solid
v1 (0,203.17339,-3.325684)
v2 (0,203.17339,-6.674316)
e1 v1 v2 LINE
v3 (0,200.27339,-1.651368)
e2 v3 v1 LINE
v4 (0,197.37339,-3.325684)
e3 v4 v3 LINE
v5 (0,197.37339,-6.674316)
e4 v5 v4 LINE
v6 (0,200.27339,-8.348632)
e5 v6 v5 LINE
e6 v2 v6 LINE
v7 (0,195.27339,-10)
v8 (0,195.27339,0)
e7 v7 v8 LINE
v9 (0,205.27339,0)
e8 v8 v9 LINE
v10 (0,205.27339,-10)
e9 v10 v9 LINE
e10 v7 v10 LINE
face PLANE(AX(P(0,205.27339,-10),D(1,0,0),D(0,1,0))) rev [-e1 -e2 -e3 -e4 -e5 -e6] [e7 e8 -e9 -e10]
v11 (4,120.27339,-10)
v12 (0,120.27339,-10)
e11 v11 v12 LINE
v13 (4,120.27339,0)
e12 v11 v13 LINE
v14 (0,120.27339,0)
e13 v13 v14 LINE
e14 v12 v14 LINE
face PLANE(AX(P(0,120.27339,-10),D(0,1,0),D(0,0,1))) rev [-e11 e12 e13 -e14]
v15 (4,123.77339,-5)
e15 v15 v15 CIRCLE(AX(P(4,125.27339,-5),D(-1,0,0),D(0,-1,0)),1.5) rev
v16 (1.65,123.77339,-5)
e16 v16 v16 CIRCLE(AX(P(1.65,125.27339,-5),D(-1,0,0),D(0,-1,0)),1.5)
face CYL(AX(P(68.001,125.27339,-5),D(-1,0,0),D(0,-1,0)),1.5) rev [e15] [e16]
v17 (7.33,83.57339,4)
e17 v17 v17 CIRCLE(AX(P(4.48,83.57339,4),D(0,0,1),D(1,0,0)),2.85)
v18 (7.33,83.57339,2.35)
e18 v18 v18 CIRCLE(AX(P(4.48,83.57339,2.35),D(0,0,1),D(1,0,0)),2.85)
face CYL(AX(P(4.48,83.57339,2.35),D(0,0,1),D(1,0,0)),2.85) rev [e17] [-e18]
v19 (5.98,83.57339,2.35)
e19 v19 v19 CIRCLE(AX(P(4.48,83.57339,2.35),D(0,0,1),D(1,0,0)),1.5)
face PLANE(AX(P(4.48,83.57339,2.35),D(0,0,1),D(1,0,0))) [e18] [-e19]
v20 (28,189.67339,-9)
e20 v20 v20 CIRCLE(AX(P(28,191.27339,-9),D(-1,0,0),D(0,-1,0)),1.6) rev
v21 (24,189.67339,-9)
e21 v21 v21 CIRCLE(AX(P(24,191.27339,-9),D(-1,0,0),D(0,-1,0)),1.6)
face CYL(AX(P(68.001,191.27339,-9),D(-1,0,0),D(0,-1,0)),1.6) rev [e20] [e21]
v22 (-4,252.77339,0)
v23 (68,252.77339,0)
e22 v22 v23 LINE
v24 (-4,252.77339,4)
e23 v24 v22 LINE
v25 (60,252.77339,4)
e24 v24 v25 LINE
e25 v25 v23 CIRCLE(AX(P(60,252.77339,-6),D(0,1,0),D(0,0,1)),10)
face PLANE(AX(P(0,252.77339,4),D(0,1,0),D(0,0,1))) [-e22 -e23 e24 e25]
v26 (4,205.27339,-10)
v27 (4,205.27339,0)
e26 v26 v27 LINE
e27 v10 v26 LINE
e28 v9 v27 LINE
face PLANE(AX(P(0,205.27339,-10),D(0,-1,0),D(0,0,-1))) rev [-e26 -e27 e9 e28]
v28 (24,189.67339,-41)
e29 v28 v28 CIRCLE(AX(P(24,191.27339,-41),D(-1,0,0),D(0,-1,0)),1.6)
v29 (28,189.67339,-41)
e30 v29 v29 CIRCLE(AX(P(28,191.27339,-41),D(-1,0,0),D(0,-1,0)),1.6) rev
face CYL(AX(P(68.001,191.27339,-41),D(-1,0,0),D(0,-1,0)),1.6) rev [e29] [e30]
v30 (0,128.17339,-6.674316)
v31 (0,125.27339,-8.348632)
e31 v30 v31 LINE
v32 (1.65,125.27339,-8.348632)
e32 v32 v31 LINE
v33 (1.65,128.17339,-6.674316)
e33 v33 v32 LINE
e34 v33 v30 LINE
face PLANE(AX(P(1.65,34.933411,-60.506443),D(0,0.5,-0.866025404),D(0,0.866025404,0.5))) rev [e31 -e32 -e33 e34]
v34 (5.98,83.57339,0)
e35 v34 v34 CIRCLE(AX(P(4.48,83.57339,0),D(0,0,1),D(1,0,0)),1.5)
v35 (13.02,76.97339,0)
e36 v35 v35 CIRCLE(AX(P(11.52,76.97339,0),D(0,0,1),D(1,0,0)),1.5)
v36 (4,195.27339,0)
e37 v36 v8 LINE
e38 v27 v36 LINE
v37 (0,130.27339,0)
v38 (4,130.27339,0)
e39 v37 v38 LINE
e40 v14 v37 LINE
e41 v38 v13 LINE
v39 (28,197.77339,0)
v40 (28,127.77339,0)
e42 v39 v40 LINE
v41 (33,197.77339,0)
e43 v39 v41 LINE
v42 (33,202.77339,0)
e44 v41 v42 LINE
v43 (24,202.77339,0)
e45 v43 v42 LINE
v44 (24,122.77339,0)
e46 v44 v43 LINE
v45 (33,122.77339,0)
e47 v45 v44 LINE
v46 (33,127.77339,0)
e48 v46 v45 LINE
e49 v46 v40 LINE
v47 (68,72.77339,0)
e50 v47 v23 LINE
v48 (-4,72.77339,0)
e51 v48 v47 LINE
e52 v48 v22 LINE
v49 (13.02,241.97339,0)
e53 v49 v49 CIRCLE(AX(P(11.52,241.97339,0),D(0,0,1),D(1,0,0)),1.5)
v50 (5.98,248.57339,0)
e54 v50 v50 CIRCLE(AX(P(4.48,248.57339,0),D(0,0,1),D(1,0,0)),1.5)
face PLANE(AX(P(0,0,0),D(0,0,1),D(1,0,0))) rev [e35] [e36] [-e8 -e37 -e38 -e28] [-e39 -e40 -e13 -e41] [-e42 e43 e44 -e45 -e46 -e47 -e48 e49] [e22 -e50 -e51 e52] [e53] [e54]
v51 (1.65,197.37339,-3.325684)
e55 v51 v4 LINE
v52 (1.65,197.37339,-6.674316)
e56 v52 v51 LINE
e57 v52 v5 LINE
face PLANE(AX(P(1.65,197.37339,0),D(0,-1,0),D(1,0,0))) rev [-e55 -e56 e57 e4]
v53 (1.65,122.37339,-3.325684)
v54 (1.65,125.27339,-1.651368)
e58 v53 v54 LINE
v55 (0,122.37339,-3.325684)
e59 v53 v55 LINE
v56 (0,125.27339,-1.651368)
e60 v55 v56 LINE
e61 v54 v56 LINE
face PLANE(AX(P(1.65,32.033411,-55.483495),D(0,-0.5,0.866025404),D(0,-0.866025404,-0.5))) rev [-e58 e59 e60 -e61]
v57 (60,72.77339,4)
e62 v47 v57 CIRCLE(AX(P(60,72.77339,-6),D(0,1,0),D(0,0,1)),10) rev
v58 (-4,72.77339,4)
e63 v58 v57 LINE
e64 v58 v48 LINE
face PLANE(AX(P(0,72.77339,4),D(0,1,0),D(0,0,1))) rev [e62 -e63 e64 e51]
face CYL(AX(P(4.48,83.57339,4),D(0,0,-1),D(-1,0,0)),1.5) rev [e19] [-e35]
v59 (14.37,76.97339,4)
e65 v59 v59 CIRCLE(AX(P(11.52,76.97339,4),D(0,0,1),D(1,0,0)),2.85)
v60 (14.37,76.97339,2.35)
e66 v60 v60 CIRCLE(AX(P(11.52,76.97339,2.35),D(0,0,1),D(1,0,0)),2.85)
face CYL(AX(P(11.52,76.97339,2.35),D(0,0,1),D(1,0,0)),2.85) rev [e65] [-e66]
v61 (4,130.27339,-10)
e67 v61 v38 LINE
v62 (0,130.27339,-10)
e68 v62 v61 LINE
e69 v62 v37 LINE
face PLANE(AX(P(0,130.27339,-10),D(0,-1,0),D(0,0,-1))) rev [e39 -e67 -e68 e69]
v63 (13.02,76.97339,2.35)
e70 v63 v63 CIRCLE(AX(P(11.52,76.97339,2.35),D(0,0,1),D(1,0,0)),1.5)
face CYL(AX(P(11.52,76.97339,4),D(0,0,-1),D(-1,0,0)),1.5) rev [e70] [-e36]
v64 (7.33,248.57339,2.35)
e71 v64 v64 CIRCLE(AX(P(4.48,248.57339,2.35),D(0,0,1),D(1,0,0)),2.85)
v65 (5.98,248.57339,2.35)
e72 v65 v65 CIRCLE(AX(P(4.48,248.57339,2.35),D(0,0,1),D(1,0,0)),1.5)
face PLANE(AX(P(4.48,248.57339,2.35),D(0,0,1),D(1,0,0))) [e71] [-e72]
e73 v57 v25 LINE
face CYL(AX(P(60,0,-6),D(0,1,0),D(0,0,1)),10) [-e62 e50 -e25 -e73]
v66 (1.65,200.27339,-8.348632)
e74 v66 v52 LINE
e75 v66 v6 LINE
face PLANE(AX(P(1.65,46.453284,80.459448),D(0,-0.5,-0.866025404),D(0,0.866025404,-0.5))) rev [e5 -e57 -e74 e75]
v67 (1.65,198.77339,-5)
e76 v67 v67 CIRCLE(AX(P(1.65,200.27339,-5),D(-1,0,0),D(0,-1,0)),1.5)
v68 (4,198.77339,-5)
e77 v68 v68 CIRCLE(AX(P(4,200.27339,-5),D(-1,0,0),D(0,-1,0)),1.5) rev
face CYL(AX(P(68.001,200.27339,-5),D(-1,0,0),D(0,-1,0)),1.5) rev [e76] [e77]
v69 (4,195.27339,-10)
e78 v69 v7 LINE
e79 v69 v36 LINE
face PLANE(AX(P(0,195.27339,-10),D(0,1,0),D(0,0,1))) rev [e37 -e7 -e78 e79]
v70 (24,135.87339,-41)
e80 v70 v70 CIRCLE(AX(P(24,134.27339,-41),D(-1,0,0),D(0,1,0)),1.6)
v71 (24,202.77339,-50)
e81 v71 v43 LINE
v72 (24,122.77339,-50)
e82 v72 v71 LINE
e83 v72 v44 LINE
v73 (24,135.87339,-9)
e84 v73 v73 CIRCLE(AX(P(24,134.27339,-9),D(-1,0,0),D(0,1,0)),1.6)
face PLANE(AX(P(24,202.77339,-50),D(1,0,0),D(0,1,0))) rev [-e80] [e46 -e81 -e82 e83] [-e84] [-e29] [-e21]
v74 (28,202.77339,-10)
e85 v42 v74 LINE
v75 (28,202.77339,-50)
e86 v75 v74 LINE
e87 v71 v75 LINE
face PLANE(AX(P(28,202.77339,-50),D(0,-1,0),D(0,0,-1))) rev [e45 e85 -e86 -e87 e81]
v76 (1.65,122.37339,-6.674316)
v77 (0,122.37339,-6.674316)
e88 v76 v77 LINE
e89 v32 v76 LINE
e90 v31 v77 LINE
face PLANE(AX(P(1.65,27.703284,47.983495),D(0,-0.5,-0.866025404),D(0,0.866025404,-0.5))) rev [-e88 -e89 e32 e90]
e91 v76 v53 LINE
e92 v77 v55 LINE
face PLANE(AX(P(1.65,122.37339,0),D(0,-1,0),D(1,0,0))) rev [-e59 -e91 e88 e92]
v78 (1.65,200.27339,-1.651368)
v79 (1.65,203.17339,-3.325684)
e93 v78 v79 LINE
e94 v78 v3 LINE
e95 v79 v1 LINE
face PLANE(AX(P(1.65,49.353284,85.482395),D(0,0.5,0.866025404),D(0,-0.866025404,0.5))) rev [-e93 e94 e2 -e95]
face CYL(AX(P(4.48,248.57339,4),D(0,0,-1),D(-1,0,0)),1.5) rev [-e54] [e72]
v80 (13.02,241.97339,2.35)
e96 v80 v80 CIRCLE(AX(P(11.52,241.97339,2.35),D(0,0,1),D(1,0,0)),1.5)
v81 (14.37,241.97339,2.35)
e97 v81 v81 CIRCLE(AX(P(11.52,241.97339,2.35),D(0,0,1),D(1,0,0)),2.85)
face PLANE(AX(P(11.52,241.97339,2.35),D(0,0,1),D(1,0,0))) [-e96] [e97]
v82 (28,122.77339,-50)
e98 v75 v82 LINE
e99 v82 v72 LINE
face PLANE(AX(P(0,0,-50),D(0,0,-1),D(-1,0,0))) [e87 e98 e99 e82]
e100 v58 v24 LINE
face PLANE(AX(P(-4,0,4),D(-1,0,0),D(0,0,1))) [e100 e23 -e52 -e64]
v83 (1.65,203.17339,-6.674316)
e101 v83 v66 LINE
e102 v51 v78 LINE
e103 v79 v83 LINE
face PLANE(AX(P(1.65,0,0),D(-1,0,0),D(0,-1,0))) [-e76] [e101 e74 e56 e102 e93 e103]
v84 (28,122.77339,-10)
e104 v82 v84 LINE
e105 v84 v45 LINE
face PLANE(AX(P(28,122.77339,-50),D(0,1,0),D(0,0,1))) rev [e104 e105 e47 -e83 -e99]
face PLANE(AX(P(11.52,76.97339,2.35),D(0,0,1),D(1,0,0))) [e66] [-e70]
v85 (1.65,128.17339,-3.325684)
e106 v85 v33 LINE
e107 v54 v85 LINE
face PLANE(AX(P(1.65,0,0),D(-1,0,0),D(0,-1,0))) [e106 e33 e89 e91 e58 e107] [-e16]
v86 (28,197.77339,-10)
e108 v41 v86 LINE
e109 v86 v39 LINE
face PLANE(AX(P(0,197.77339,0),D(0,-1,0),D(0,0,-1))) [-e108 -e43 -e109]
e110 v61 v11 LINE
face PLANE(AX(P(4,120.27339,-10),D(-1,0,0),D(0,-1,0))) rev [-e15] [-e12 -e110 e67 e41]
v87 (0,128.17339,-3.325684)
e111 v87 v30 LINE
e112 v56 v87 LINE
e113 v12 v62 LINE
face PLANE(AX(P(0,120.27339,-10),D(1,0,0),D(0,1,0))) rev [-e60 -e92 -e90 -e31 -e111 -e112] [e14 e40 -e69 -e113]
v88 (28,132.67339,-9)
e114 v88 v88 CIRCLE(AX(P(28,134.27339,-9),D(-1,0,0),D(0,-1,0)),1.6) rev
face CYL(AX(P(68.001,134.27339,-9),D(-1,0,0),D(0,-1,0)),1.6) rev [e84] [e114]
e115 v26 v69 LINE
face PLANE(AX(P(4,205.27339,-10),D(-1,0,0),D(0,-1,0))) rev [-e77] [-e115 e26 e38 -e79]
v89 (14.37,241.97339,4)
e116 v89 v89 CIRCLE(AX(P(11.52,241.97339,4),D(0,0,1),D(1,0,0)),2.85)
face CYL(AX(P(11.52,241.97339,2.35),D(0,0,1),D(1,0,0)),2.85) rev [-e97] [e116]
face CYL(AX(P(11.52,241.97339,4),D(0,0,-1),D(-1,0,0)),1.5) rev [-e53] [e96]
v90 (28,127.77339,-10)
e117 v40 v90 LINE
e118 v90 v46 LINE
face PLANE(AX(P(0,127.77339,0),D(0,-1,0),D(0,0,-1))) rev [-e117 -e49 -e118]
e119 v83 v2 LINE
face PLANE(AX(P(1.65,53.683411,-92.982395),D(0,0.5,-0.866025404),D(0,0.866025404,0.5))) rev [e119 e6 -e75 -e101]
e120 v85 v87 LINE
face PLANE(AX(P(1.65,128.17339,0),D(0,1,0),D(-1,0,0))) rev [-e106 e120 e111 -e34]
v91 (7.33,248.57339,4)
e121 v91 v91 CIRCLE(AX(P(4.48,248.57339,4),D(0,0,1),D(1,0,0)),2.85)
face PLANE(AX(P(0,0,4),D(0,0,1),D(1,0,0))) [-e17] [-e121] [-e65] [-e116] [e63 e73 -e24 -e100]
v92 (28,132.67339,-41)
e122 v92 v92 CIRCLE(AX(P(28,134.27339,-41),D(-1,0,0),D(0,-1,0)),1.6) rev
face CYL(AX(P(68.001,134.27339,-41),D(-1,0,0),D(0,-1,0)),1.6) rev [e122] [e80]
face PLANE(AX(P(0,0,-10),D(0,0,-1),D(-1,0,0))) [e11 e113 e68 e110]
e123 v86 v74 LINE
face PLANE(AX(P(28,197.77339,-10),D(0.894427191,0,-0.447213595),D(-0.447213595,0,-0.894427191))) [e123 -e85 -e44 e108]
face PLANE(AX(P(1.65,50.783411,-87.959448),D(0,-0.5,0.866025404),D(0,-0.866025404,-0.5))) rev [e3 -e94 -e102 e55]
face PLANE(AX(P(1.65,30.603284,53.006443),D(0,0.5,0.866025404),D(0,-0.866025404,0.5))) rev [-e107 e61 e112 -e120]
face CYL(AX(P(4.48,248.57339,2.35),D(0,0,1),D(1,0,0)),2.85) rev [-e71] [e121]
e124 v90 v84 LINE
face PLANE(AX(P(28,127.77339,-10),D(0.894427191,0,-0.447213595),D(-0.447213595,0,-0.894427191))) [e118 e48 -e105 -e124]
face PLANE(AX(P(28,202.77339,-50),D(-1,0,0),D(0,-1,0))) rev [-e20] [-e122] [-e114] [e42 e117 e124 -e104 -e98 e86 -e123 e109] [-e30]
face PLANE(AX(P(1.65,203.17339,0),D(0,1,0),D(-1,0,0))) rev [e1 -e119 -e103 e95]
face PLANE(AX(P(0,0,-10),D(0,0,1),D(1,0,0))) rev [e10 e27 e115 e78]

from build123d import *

# Parameters (mm, degrees)
CROQUIS1_W              = 72
CROQUIS1_H              = 180
CROQUIS1_R              = 2.85
CROQUIS1_R_2            = 1.5
SALIENTE_EXTRUIR1_DEPTH = 4
CROQUIS2_R              = 2.85
CORTAR_EXTRUIR1_DEPTH   = 1.65
CROQUIS3_W              = 4
CROQUIS3_H              = 10
SALIENTE_EXTRUIR2_DEPTH = 10
CORTAR_EXTRUIR2_REACH   = 263.951
CROQUIS4_R              = 1.5
CROQUIS4_3_R            = 1.5
CORTAR_EXTRUIR3_DEPTH   = 1.65
REDONDEO3_R             = 10
CROQUIS5_W              = 4
CROQUIS5_H              = 80
SALIENTE_EXTRUIR3_DEPTH = 50
SALIENTE_EXTRUIR4_DEPTH = 5
SALIENTE_EXTRUIR5_DEPTH = 5
CORTAR_EXTRUIR4_REACH   = 263.401
CROQUIS9_R              = 1.6


with BuildPart() as part:
    # Croquis1 → Saliente-Extruir1 (new body)
    # profile 1 of 5: a face of its own
    with BuildSketch(Plane.XY):
        with Locations((32, 162.773389683)):
            Rectangle(CROQUIS1_W, CROQUIS1_H)
        with Locations((4.48, 83.573389683)):
            Circle(CROQUIS1_R, mode=Mode.SUBTRACT)
        with Locations((11.52, 76.973389683)):
            Circle(CROQUIS1_R, mode=Mode.SUBTRACT)
        with Locations((11.52, 241.973389683)):
            Circle(CROQUIS1_R, mode=Mode.SUBTRACT)
        with Locations((4.48, 248.573389683)):
            Circle(CROQUIS1_R, mode=Mode.SUBTRACT)
    # profile 2 of 5: a face of its own
    with BuildSketch(Plane.XY):
        with Locations((4.48, 83.573389683)):
            Circle(CROQUIS1_R)
        with Locations((4.48, 83.573389683)):
            Circle(CROQUIS1_R_2, mode=Mode.SUBTRACT)
    # profile 3 of 5: a face of its own
    with BuildSketch(Plane.XY):
        with Locations((11.52, 76.973389683)):
            Circle(CROQUIS1_R)
        with Locations((11.52, 76.973389683)):
            Circle(CROQUIS1_R_2, mode=Mode.SUBTRACT)
    # profile 4 of 5: a face of its own
    with BuildSketch(Plane.XY):
        with Locations((11.52, 241.973389683)):
            Circle(CROQUIS1_R)
        with Locations((11.52, 241.973389683)):
            Circle(CROQUIS1_R_2, mode=Mode.SUBTRACT)
    # profile 5 of 5: a face of its own
    with BuildSketch(Plane.XY):
        with Locations((4.48, 248.573389683)):
            Circle(CROQUIS1_R)
        with Locations((4.48, 248.573389683)):
            Circle(CROQUIS1_R_2, mode=Mode.SUBTRACT)
    extrude(amount=SALIENTE_EXTRUIR1_DEPTH)

    # Croquis2 → Cortar-Extruir1 (cut)
    with BuildSketch(Plane.XY.offset(4)):
        with Locations((4.48, 248.573389683)):
            Circle(CROQUIS2_R)
        with Locations((11.52, 241.973389683)):
            Circle(CROQUIS2_R)
        with Locations((4.48, 83.573389683)):
            Circle(CROQUIS2_R)
        with Locations((11.52, 76.973389683)):
            Circle(CROQUIS2_R)
    extrude(amount=-CORTAR_EXTRUIR1_DEPTH, mode=Mode.SUBTRACT)

    # Croquis3 → Saliente-Extruir2 (add)
    with BuildSketch(Plane(origin=(0, 0, 0), x_dir=(-1, 0, 0), z_dir=(0, 0, -1))):
        with Locations((-2, 200.273389683)):
            Rectangle(CROQUIS3_W, CROQUIS3_H)
        with Locations((-2, 125.273389683)):
            Rectangle(CROQUIS3_W, CROQUIS3_H)
    extrude(amount=SALIENTE_EXTRUIR2_DEPTH)

    # Croquis4 → Cortar-Extruir2 (cut, up to next)
    with BuildSketch(Plane.ZY, mode=Mode.PRIVATE) as cortar_extruir2_sk1:
        with Locations(Location((-5, 125.273389683, 0), (0, 0, 270))):
            Circle(CROQUIS4_R)
    cortar_extruir2_tool1 = extrude(cortar_extruir2_sk1.sketch, amount=-CORTAR_EXTRUIR2_REACH, mode=Mode.PRIVATE) & part.part
    # Croquis4 → Cortar-Extruir2 (cut, up to next)
    with BuildSketch(Plane.ZY, mode=Mode.PRIVATE) as cortar_extruir2_sk2:
        with Locations(Location((-5, 200.273389683, 0), (0, 0, 270))):
            Circle(CROQUIS4_R)
    cortar_extruir2_tool2 = extrude(cortar_extruir2_sk2.sketch, amount=-CORTAR_EXTRUIR2_REACH, mode=Mode.PRIVATE) & part.part
    add(cortar_extruir2_tool1.solids().sort_by_distance((0, 125.27339, -5))[0], mode=Mode.SUBTRACT)
    add(cortar_extruir2_tool2.solids().sort_by_distance((0, 200.27339, -5))[0], mode=Mode.SUBTRACT)

    # Croquis4<3> → Cortar-Extruir3 (cut)
    # profile 1 of 2: a face of its own
    with BuildSketch(Plane.ZY):
        Polygon((-8.348631561, 200.273389683), (-6.674315781, 197.373389683), (-3.325684219, 197.373389683), (-1.651368439, 200.273389683), (-3.325684219, 203.173389683), (-6.674315781, 203.173389683), align=None)
        with Locations(Location((-5, 200.273389683, 0), (0, 0, 270))):
            Circle(CROQUIS4_3_R, mode=Mode.SUBTRACT)
    # profile 2 of 2: a face of its own
    with BuildSketch(Plane.ZY):
        Polygon((-8.348631561, 125.273389683), (-6.674315781, 122.373389683), (-3.325684219, 122.373389683), (-1.651368439, 125.273389683), (-3.325684219, 128.173389683), (-6.674315781, 128.173389683), align=None)
        with Locations(Location((-5, 125.273389683, 0), (0, 0, 270))):
            Circle(CROQUIS4_3_R, mode=Mode.SUBTRACT)
    extrude(amount=-CORTAR_EXTRUIR3_DEPTH, mode=Mode.SUBTRACT)

    # Redondeo3
    # the kernel refuses this fillet: 10 mm, written as the material it takes off along each edge
    with BuildSketch(Plane(origin=(68, 52.773389683, 4), x_dir=(0, 0, -1), z_dir=(0, 1, 0))) as redondeo3_piece_1:
        with BuildLine():
            CenterArc((10, 8), REDONDEO3_R, 180, 53.130102354)
            Line((0, 8), (-0.2, 8))
            Line((-0.2, 8), (-0.2, 0))
            Line((-0.2, 0), (0, -0.2))
            ThreePointArc((0, -0.2), (2, -0.2), (3.88, -0.16))
            Line((3.88, -0.16), (4, 0))
        make_face()
    extrude(amount=220, mode=Mode.SUBTRACT)

    # Croquis5 → Saliente-Extruir3 (add)
    with BuildSketch(Plane(origin=(0, 0, 0), x_dir=(-1, 0, 0), z_dir=(0, 0, -1))):
        with Locations((-26, 162.773389683)):
            Rectangle(CROQUIS5_W, CROQUIS5_H)
    extrude(amount=SALIENTE_EXTRUIR3_DEPTH)

    # Croquis6 → Saliente-Extruir4 (add)
    with BuildSketch(Plane(origin=(0, 202.773389683, 0), x_dir=(1, 0, 0), z_dir=(0, 1, 0))):
        Polygon((28, 0), (33, 0), (28, 10), align=None)
    extrude(amount=-SALIENTE_EXTRUIR4_DEPTH)

    # Croquis7 → Saliente-Extruir5 (add)
    with BuildSketch(Plane.XZ.offset(-122.773389683)):
        Polygon((28, 0), (33, 0), (28, -10), align=None)
    extrude(amount=-SALIENTE_EXTRUIR5_DEPTH)

    # Croquis9 → Cortar-Extruir4 (cut, up to next)
    with BuildSketch(Plane.ZY.offset(-24), mode=Mode.PRIVATE) as cortar_extruir4_sk1:
        with Locations(Location((-9, 191.273389683, 0), (0, 0, 270))):
            Circle(CROQUIS9_R)
    cortar_extruir4_tool1 = extrude(cortar_extruir4_sk1.sketch, amount=-CORTAR_EXTRUIR4_REACH, mode=Mode.PRIVATE) & part.part
    # Croquis9 → Cortar-Extruir4 (cut, up to next)
    with BuildSketch(Plane.ZY.offset(-24), mode=Mode.PRIVATE) as cortar_extruir4_sk2:
        with Locations(Location((-41, 191.273389683, 0), (0, 0, 270))):
            Circle(CROQUIS9_R)
    cortar_extruir4_tool2 = extrude(cortar_extruir4_sk2.sketch, amount=-CORTAR_EXTRUIR4_REACH, mode=Mode.PRIVATE) & part.part
    # Croquis9 → Cortar-Extruir4 (cut, up to next)
    with BuildSketch(Plane.ZY.offset(-24), mode=Mode.PRIVATE) as cortar_extruir4_sk3:
        with Locations(Location((-41, 134.273389683, 0), (0, 0, 270))):
            Circle(CROQUIS9_R)
    cortar_extruir4_tool3 = extrude(cortar_extruir4_sk3.sketch, amount=-CORTAR_EXTRUIR4_REACH, mode=Mode.PRIVATE) & part.part
    # Croquis9 → Cortar-Extruir4 (cut, up to next)
    with BuildSketch(Plane.ZY.offset(-24), mode=Mode.PRIVATE) as cortar_extruir4_sk4:
        with Locations(Location((-9, 134.273389683, 0), (0, 0, 270))):
            Circle(CROQUIS9_R)
    cortar_extruir4_tool4 = extrude(cortar_extruir4_sk4.sketch, amount=-CORTAR_EXTRUIR4_REACH, mode=Mode.PRIVATE) & part.part
    add(cortar_extruir4_tool1.solids().sort_by_distance((24, 191.27339, -9))[0], mode=Mode.SUBTRACT)
    add(cortar_extruir4_tool2.solids().sort_by_distance((24, 191.27339, -41))[0], mode=Mode.SUBTRACT)
    add(cortar_extruir4_tool3.solids().sort_by_distance((24, 134.27339, -41))[0], mode=Mode.SUBTRACT)
    add(cortar_extruir4_tool4.solids().sort_by_distance((24, 134.27339, -9))[0], mode=Mode.SUBTRACT)


solid = part.part
